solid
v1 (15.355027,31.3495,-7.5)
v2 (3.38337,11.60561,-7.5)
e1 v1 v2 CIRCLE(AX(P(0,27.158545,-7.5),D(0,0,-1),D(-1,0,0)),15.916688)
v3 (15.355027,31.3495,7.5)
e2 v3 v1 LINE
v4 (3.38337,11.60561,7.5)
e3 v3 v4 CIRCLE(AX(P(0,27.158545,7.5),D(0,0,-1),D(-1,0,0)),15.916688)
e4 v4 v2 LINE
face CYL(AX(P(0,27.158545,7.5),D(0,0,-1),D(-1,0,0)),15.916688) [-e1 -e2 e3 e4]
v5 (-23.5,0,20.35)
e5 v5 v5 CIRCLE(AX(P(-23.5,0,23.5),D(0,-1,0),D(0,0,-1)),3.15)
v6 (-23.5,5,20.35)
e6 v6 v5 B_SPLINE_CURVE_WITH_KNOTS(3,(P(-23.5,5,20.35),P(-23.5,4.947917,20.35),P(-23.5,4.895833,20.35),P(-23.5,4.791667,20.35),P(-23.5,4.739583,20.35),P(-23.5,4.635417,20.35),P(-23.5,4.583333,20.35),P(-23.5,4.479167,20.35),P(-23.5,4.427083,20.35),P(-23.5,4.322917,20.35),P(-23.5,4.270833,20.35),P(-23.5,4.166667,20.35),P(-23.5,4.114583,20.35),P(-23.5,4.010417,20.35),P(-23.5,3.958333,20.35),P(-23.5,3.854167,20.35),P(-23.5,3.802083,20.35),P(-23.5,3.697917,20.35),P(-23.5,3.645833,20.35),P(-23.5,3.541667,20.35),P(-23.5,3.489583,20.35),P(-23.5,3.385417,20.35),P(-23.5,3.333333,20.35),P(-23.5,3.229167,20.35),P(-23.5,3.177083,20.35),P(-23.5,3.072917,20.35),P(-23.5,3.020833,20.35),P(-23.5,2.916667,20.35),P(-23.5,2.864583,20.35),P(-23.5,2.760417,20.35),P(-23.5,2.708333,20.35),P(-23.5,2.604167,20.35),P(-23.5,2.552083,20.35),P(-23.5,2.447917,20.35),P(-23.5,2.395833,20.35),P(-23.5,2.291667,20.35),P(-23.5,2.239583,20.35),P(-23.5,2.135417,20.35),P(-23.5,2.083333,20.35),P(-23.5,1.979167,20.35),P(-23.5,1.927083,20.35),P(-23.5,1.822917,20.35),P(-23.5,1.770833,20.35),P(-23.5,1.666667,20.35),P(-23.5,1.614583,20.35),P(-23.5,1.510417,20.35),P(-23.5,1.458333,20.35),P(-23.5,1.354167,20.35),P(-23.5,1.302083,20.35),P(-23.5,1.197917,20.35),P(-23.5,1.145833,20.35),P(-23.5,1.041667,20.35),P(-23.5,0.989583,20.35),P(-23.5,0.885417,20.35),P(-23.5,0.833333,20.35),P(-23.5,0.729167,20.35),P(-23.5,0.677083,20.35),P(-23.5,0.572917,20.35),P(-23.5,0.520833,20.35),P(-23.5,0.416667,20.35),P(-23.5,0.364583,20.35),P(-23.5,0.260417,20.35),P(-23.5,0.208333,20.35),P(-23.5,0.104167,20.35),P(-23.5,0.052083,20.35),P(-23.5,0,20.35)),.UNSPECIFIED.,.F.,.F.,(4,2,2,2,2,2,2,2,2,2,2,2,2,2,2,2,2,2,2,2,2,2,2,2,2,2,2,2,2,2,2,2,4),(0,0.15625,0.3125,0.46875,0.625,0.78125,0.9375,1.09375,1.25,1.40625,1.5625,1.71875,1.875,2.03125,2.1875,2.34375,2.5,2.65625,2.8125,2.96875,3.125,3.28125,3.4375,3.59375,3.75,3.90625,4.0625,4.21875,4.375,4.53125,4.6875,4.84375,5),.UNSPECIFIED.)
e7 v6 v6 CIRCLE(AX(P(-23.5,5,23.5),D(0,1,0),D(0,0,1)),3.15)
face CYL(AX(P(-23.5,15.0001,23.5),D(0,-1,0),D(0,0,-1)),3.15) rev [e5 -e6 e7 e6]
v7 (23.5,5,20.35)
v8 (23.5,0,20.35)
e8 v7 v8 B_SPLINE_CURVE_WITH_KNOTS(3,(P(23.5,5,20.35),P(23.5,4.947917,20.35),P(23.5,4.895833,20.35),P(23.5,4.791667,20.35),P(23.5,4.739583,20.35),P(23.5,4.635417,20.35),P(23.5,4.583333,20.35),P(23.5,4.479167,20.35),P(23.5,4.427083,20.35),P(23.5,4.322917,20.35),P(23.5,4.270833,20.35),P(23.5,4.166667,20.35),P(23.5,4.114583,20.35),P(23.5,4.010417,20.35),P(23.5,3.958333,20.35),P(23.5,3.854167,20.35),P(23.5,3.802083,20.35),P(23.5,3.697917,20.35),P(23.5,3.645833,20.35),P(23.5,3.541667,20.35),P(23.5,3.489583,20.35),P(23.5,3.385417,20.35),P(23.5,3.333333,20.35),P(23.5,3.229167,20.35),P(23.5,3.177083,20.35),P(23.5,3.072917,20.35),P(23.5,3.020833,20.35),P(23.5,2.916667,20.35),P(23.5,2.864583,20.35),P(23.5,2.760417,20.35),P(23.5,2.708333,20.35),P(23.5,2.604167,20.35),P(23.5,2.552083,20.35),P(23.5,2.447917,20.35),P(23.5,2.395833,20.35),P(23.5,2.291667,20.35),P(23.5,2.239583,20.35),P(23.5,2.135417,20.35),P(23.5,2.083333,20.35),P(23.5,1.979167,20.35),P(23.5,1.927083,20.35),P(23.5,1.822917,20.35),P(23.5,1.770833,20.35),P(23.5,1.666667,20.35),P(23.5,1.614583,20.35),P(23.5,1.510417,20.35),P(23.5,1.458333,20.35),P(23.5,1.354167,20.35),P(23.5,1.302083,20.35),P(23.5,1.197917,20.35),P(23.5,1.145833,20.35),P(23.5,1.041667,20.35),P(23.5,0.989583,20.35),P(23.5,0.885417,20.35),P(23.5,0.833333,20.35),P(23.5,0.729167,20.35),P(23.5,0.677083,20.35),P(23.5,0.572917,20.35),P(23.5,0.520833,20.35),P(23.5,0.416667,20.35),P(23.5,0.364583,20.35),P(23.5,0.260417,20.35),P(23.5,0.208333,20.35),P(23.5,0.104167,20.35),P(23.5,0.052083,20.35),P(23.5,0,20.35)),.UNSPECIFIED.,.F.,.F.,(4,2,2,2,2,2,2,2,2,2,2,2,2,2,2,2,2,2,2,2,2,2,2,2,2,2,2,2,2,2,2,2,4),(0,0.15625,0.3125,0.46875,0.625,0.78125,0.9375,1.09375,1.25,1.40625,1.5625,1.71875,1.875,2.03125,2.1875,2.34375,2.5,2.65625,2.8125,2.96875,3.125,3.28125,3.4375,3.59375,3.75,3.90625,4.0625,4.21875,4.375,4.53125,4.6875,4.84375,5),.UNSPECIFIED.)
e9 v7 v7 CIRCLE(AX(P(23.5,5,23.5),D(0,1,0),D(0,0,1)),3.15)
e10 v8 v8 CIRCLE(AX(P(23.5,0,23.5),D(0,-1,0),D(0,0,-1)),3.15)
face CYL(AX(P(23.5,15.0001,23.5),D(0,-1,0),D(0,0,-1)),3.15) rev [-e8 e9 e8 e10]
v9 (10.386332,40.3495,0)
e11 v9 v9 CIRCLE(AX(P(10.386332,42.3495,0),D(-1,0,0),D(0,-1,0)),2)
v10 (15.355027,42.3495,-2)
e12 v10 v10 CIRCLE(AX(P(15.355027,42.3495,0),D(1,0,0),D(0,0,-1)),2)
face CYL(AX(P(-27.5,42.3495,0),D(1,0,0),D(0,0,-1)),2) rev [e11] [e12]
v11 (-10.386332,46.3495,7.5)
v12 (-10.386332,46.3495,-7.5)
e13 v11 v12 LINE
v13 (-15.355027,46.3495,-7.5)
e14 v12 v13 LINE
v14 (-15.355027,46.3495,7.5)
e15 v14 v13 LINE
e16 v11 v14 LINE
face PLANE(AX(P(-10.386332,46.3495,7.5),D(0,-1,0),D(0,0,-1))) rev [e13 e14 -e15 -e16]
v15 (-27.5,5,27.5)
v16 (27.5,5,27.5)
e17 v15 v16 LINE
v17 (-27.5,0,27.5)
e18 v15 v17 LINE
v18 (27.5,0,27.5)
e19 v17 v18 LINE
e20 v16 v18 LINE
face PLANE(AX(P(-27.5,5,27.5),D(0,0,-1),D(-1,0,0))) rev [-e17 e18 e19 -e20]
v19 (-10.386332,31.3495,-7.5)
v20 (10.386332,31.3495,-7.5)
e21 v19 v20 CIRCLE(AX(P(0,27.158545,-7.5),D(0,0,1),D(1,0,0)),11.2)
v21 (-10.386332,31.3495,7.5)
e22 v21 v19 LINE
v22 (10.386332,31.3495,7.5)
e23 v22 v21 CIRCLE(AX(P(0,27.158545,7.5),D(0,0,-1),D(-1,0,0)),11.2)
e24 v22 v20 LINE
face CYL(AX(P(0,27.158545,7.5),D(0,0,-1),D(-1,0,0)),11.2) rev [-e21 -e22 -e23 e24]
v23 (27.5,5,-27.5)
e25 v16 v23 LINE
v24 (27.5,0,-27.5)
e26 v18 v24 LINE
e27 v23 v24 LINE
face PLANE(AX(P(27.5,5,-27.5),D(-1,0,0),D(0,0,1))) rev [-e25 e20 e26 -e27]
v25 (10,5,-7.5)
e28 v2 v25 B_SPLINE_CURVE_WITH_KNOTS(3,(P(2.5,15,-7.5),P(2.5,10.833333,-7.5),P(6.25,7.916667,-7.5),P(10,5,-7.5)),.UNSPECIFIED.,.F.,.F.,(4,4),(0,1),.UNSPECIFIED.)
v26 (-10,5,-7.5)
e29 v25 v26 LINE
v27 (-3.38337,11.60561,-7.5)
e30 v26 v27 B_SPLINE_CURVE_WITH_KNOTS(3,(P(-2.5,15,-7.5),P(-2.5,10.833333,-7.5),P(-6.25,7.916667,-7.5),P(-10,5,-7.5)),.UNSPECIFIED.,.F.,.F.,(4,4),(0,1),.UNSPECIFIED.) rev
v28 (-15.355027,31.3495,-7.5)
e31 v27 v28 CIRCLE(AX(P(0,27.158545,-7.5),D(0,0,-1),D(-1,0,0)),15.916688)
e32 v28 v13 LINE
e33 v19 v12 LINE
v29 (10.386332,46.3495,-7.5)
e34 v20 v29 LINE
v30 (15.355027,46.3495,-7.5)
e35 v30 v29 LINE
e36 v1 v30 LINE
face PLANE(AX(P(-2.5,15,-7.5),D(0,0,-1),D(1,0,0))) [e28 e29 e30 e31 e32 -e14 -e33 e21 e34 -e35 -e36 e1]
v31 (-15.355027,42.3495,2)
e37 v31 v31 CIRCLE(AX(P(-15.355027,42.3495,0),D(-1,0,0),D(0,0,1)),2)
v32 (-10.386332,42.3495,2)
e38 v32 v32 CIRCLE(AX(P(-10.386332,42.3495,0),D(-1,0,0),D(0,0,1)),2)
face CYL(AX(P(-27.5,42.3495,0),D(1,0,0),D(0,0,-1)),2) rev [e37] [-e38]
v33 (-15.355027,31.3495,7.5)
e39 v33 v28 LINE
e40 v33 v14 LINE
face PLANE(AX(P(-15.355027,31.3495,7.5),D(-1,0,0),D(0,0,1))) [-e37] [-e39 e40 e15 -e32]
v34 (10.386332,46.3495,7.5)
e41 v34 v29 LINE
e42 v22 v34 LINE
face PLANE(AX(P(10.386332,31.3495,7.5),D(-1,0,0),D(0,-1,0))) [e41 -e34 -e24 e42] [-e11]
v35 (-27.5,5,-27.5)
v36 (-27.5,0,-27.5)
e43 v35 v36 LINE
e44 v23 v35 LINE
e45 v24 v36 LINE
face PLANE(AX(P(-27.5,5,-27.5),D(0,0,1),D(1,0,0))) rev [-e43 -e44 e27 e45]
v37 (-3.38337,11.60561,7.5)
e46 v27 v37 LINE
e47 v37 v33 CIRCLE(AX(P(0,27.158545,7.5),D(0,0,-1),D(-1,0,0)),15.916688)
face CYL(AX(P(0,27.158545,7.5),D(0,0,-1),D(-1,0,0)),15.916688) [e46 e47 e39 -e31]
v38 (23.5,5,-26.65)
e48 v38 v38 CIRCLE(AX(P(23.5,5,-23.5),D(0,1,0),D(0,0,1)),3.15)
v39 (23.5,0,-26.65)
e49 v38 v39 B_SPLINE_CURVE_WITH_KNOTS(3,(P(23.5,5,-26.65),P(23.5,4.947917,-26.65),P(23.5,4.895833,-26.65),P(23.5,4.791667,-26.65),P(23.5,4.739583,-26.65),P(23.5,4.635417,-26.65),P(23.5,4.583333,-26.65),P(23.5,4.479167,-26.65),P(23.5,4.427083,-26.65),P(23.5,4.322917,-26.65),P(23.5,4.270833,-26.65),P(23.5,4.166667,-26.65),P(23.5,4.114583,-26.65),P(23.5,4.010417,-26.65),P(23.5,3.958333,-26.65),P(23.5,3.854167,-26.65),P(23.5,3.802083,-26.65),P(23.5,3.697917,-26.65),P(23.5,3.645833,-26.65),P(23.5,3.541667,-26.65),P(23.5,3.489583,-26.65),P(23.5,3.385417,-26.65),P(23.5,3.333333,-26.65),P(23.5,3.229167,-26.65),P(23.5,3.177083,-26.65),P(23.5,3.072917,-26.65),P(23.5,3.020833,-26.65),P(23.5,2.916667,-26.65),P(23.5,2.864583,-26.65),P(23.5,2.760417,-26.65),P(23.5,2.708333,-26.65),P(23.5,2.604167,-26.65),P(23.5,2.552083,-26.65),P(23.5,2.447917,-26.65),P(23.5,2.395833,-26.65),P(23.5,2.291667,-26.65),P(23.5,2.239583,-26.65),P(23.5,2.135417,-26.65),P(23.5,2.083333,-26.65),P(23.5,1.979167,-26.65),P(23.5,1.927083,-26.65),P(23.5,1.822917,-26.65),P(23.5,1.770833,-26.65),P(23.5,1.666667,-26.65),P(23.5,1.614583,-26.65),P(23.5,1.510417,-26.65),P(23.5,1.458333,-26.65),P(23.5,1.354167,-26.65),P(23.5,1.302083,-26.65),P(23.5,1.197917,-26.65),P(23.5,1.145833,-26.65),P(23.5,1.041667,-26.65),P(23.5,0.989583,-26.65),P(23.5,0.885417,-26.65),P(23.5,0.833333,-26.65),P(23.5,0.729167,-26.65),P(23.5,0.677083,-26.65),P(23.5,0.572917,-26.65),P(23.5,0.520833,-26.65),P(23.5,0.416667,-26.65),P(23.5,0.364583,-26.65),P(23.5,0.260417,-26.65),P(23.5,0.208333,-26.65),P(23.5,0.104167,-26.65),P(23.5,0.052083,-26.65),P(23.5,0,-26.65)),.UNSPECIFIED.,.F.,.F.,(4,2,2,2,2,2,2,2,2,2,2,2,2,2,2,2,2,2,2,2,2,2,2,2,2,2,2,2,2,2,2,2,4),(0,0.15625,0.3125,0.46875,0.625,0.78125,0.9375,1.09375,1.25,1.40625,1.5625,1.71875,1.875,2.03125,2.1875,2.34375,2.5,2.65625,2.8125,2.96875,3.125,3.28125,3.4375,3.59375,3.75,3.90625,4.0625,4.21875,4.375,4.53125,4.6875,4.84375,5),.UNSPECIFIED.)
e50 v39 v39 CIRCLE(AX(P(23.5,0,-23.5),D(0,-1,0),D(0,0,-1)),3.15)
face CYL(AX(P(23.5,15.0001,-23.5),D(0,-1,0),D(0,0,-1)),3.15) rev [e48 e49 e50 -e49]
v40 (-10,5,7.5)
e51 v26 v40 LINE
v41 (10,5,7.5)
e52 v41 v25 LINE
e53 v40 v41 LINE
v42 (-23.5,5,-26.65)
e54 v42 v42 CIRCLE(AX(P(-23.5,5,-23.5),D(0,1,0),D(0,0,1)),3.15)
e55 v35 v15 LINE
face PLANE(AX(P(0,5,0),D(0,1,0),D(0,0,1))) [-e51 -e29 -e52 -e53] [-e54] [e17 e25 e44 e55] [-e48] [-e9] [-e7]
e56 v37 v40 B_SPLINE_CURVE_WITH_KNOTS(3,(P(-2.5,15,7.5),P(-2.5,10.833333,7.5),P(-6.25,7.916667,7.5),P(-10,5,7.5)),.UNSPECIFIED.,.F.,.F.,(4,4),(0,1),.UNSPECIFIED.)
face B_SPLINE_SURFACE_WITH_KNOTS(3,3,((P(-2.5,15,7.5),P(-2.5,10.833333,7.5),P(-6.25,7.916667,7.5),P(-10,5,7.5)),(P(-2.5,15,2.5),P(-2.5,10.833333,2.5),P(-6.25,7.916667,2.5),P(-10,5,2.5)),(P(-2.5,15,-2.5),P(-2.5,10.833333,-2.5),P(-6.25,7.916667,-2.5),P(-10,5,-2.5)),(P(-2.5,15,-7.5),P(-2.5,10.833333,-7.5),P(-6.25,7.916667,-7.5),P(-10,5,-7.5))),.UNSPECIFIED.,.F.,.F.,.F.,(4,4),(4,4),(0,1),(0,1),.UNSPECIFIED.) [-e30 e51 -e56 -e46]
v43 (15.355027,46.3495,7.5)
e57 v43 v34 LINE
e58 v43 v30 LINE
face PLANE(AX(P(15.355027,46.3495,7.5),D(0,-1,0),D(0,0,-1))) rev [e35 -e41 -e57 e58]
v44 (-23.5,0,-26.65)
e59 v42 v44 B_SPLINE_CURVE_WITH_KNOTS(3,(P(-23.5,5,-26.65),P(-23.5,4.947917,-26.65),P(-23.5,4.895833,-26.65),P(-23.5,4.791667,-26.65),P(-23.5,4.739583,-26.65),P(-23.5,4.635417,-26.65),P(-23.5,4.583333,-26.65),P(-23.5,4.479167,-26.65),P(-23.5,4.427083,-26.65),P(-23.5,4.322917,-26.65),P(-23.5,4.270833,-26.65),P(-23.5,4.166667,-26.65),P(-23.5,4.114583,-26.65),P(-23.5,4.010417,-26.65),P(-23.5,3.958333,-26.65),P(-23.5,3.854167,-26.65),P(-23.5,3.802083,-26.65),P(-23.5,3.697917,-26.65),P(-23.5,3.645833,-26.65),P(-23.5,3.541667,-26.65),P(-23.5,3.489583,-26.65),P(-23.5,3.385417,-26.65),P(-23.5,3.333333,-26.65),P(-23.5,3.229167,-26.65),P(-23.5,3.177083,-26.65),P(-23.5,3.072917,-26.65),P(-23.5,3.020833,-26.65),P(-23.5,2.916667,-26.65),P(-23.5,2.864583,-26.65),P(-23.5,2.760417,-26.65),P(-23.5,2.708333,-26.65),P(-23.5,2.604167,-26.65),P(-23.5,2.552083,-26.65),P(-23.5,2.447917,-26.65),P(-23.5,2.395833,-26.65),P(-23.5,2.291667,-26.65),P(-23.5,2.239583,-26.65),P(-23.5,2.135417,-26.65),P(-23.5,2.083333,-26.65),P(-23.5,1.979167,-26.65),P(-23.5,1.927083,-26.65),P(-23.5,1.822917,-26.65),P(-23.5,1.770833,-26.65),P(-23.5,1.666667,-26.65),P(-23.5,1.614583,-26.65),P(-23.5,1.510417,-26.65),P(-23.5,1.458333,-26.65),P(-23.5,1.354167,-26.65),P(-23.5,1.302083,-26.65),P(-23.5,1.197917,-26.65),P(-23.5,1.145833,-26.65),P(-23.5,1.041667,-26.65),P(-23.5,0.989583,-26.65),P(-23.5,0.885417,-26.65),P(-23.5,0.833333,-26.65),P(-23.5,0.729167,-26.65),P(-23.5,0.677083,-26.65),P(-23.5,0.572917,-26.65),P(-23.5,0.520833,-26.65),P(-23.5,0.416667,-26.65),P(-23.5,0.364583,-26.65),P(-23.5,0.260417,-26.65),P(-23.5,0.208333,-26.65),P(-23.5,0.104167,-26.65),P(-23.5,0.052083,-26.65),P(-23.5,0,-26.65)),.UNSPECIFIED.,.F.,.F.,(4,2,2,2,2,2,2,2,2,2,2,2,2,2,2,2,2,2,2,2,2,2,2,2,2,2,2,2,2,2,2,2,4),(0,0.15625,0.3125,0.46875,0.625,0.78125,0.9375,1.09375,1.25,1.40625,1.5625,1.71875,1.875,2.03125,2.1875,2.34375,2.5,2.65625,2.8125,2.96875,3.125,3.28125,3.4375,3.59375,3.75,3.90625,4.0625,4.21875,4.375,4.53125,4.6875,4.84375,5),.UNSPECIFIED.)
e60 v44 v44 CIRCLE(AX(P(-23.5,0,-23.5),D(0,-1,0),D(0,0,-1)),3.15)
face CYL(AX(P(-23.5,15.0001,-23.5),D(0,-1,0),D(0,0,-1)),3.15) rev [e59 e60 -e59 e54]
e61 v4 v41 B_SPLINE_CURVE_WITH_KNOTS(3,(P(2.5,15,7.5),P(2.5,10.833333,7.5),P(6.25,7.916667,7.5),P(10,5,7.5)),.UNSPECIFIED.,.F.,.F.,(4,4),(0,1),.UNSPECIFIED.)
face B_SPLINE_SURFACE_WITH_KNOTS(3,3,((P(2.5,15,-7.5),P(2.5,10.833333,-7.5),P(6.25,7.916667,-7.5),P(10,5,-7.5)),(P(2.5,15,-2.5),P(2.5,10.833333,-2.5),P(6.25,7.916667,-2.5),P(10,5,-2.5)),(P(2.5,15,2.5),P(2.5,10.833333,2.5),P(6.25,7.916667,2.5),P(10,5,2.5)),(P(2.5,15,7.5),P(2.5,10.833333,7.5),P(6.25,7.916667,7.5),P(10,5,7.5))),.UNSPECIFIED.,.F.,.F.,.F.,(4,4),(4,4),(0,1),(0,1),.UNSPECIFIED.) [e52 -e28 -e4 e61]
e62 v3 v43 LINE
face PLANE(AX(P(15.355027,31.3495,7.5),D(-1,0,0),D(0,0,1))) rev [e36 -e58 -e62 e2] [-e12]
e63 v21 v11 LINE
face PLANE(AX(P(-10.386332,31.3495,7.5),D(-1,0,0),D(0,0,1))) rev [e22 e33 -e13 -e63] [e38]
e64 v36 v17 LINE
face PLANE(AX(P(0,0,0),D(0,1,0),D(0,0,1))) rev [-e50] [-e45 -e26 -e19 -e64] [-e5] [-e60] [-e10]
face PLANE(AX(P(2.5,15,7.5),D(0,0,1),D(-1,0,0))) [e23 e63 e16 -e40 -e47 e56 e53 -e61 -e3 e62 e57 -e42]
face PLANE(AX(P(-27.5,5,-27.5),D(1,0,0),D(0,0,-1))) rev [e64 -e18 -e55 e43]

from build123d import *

# Parameters (mm, degrees)
SKETCH1_W           = 55
SKETCH1_H           = 55
BOSS_EXTRUDE1_DEPTH = 5
LOFT1_START         = -7.5
LOFT1_DEPTH         = 15
SKETCH7_R           = 3.15
CUT_EXTRUDE1_DEPTH  = 42.683330037
BOSS_EXTRUDE2_DEPTH = 15
SKETCH10_R          = 2
CUT_EXTRUDE2_DEPTH  = 69.855497331


# Read off the part's stored shape, not the designer's step: Loft1
with BuildPart() as part:
    # Sketch1 → Boss-Extrude1 (new body)
    with BuildSketch(Plane(origin=(0, 0, 0), x_dir=(1, 0, 0), z_dir=(0, 1, 0))):
        Rectangle(SKETCH1_W, SKETCH1_H)
    extrude(amount=BOSS_EXTRUDE1_DEPTH)

    # Loft1 outline → Loft1 (add)
    with BuildSketch(Plane.XY.offset(LOFT1_START)):
        with BuildLine():
            add(Edge.make_bspline(
                [(2.5, 15), (2.5, 10.833333333), (6.25, 7.916666667), (10, 5)],
                knots=[0, 0, 0, 0, 1, 1, 1, 1], degree=3))
            Line((2.5, 15), (-2.5, 15))
            add(Edge.make_bspline(
                [(-2.5, 15), (-2.5, 10.833333333), (-6.25, 7.916666667), (-10, 5)],
                knots=[0, 0, 0, 0, 1, 1, 1, 1], degree=3))
            Line((-10, 5), (10, 5))
        make_face()
    extrude(amount=LOFT1_DEPTH)

    # Sketch7 → Cut-Extrude1 (cut, through all)
    with BuildSketch(Plane(origin=(0, 0, 0), x_dir=(-1, 0, 0), z_dir=(0, -1, 0))):
        with Locations(Location((23.5, -23.5, 0), (0, 0, 90))):
            Circle(SKETCH7_R)
        with Locations(Location((-23.5, -23.5, 0), (0, 0, 90))):
            Circle(SKETCH7_R)
        with Locations(Location((-23.5, 23.5, 0), (0, 0, 90))):
            Circle(SKETCH7_R)
        with Locations(Location((23.5, 23.5, 0), (0, 0, 90))):
            Circle(SKETCH7_R)
    extrude(amount=-CUT_EXTRUDE1_DEPTH, mode=Mode.SUBTRACT)

    # Sketch8 → Boss-Extrude2 (add)
    with BuildSketch(Plane(origin=(0, 0, -7.5), x_dir=(-1, 0, 0), z_dir=(0, 0, -1))):
        with BuildLine():
            Line((-10.386332084, 31.349499896), (-10.386332084, 46.349499896))
            Line((-10.386332084, 46.349499896), (-15.355027277, 46.349499896))
            Line((-15.355027277, 46.349499896), (-15.355027277, 31.349499896))
            ThreePointArc((-15.355027277, 31.349499896), (0, 11.24185629), (15.355027277, 31.349499896))
            Line((15.355027277, 31.349499896), (15.355027277, 46.349499896))
            Line((15.355027277, 46.349499896), (10.386332084, 46.349499896))
            Line((10.386332084, 46.349499896), (10.386332084, 31.349499896))
            ThreePointArc((10.386332084, 31.349499896), (10.968139681, 29.425682042), (11.196737575, 27.428855004))
            ThreePointArc((11.196737575, 27.428855004), (11.085843409, 25.563528692), (10.666364419, 23.742601142))
            ThreePointArc((10.666364419, 23.742601142), (0, 15.958544655), (-10.666364419, 23.742601142))
            ThreePointArc((-10.666364419, 23.742601142), (-11.048273693, 25.321250886), (-11.197838961, 26.93853872))
            ThreePointArc((-11.197838961, 26.93853872), (-11.015137518, 29.185055314), (-10.386332084, 31.349499896))
        make_face()
    extrude(amount=-BOSS_EXTRUDE2_DEPTH)

    # Sketch10 → Cut-Extrude2 (cut, through all)
    with BuildSketch(Plane(origin=(15.355027277, 0, 0), x_dir=(0, 0, -1), z_dir=(1, 0, 0))):
        with Locations(Location((0, 42.349499896, 0), (0, 0, 180))):
            Circle(SKETCH10_R)
    extrude(amount=-CUT_EXTRUDE2_DEPTH, mode=Mode.SUBTRACT)


solid = part.part
